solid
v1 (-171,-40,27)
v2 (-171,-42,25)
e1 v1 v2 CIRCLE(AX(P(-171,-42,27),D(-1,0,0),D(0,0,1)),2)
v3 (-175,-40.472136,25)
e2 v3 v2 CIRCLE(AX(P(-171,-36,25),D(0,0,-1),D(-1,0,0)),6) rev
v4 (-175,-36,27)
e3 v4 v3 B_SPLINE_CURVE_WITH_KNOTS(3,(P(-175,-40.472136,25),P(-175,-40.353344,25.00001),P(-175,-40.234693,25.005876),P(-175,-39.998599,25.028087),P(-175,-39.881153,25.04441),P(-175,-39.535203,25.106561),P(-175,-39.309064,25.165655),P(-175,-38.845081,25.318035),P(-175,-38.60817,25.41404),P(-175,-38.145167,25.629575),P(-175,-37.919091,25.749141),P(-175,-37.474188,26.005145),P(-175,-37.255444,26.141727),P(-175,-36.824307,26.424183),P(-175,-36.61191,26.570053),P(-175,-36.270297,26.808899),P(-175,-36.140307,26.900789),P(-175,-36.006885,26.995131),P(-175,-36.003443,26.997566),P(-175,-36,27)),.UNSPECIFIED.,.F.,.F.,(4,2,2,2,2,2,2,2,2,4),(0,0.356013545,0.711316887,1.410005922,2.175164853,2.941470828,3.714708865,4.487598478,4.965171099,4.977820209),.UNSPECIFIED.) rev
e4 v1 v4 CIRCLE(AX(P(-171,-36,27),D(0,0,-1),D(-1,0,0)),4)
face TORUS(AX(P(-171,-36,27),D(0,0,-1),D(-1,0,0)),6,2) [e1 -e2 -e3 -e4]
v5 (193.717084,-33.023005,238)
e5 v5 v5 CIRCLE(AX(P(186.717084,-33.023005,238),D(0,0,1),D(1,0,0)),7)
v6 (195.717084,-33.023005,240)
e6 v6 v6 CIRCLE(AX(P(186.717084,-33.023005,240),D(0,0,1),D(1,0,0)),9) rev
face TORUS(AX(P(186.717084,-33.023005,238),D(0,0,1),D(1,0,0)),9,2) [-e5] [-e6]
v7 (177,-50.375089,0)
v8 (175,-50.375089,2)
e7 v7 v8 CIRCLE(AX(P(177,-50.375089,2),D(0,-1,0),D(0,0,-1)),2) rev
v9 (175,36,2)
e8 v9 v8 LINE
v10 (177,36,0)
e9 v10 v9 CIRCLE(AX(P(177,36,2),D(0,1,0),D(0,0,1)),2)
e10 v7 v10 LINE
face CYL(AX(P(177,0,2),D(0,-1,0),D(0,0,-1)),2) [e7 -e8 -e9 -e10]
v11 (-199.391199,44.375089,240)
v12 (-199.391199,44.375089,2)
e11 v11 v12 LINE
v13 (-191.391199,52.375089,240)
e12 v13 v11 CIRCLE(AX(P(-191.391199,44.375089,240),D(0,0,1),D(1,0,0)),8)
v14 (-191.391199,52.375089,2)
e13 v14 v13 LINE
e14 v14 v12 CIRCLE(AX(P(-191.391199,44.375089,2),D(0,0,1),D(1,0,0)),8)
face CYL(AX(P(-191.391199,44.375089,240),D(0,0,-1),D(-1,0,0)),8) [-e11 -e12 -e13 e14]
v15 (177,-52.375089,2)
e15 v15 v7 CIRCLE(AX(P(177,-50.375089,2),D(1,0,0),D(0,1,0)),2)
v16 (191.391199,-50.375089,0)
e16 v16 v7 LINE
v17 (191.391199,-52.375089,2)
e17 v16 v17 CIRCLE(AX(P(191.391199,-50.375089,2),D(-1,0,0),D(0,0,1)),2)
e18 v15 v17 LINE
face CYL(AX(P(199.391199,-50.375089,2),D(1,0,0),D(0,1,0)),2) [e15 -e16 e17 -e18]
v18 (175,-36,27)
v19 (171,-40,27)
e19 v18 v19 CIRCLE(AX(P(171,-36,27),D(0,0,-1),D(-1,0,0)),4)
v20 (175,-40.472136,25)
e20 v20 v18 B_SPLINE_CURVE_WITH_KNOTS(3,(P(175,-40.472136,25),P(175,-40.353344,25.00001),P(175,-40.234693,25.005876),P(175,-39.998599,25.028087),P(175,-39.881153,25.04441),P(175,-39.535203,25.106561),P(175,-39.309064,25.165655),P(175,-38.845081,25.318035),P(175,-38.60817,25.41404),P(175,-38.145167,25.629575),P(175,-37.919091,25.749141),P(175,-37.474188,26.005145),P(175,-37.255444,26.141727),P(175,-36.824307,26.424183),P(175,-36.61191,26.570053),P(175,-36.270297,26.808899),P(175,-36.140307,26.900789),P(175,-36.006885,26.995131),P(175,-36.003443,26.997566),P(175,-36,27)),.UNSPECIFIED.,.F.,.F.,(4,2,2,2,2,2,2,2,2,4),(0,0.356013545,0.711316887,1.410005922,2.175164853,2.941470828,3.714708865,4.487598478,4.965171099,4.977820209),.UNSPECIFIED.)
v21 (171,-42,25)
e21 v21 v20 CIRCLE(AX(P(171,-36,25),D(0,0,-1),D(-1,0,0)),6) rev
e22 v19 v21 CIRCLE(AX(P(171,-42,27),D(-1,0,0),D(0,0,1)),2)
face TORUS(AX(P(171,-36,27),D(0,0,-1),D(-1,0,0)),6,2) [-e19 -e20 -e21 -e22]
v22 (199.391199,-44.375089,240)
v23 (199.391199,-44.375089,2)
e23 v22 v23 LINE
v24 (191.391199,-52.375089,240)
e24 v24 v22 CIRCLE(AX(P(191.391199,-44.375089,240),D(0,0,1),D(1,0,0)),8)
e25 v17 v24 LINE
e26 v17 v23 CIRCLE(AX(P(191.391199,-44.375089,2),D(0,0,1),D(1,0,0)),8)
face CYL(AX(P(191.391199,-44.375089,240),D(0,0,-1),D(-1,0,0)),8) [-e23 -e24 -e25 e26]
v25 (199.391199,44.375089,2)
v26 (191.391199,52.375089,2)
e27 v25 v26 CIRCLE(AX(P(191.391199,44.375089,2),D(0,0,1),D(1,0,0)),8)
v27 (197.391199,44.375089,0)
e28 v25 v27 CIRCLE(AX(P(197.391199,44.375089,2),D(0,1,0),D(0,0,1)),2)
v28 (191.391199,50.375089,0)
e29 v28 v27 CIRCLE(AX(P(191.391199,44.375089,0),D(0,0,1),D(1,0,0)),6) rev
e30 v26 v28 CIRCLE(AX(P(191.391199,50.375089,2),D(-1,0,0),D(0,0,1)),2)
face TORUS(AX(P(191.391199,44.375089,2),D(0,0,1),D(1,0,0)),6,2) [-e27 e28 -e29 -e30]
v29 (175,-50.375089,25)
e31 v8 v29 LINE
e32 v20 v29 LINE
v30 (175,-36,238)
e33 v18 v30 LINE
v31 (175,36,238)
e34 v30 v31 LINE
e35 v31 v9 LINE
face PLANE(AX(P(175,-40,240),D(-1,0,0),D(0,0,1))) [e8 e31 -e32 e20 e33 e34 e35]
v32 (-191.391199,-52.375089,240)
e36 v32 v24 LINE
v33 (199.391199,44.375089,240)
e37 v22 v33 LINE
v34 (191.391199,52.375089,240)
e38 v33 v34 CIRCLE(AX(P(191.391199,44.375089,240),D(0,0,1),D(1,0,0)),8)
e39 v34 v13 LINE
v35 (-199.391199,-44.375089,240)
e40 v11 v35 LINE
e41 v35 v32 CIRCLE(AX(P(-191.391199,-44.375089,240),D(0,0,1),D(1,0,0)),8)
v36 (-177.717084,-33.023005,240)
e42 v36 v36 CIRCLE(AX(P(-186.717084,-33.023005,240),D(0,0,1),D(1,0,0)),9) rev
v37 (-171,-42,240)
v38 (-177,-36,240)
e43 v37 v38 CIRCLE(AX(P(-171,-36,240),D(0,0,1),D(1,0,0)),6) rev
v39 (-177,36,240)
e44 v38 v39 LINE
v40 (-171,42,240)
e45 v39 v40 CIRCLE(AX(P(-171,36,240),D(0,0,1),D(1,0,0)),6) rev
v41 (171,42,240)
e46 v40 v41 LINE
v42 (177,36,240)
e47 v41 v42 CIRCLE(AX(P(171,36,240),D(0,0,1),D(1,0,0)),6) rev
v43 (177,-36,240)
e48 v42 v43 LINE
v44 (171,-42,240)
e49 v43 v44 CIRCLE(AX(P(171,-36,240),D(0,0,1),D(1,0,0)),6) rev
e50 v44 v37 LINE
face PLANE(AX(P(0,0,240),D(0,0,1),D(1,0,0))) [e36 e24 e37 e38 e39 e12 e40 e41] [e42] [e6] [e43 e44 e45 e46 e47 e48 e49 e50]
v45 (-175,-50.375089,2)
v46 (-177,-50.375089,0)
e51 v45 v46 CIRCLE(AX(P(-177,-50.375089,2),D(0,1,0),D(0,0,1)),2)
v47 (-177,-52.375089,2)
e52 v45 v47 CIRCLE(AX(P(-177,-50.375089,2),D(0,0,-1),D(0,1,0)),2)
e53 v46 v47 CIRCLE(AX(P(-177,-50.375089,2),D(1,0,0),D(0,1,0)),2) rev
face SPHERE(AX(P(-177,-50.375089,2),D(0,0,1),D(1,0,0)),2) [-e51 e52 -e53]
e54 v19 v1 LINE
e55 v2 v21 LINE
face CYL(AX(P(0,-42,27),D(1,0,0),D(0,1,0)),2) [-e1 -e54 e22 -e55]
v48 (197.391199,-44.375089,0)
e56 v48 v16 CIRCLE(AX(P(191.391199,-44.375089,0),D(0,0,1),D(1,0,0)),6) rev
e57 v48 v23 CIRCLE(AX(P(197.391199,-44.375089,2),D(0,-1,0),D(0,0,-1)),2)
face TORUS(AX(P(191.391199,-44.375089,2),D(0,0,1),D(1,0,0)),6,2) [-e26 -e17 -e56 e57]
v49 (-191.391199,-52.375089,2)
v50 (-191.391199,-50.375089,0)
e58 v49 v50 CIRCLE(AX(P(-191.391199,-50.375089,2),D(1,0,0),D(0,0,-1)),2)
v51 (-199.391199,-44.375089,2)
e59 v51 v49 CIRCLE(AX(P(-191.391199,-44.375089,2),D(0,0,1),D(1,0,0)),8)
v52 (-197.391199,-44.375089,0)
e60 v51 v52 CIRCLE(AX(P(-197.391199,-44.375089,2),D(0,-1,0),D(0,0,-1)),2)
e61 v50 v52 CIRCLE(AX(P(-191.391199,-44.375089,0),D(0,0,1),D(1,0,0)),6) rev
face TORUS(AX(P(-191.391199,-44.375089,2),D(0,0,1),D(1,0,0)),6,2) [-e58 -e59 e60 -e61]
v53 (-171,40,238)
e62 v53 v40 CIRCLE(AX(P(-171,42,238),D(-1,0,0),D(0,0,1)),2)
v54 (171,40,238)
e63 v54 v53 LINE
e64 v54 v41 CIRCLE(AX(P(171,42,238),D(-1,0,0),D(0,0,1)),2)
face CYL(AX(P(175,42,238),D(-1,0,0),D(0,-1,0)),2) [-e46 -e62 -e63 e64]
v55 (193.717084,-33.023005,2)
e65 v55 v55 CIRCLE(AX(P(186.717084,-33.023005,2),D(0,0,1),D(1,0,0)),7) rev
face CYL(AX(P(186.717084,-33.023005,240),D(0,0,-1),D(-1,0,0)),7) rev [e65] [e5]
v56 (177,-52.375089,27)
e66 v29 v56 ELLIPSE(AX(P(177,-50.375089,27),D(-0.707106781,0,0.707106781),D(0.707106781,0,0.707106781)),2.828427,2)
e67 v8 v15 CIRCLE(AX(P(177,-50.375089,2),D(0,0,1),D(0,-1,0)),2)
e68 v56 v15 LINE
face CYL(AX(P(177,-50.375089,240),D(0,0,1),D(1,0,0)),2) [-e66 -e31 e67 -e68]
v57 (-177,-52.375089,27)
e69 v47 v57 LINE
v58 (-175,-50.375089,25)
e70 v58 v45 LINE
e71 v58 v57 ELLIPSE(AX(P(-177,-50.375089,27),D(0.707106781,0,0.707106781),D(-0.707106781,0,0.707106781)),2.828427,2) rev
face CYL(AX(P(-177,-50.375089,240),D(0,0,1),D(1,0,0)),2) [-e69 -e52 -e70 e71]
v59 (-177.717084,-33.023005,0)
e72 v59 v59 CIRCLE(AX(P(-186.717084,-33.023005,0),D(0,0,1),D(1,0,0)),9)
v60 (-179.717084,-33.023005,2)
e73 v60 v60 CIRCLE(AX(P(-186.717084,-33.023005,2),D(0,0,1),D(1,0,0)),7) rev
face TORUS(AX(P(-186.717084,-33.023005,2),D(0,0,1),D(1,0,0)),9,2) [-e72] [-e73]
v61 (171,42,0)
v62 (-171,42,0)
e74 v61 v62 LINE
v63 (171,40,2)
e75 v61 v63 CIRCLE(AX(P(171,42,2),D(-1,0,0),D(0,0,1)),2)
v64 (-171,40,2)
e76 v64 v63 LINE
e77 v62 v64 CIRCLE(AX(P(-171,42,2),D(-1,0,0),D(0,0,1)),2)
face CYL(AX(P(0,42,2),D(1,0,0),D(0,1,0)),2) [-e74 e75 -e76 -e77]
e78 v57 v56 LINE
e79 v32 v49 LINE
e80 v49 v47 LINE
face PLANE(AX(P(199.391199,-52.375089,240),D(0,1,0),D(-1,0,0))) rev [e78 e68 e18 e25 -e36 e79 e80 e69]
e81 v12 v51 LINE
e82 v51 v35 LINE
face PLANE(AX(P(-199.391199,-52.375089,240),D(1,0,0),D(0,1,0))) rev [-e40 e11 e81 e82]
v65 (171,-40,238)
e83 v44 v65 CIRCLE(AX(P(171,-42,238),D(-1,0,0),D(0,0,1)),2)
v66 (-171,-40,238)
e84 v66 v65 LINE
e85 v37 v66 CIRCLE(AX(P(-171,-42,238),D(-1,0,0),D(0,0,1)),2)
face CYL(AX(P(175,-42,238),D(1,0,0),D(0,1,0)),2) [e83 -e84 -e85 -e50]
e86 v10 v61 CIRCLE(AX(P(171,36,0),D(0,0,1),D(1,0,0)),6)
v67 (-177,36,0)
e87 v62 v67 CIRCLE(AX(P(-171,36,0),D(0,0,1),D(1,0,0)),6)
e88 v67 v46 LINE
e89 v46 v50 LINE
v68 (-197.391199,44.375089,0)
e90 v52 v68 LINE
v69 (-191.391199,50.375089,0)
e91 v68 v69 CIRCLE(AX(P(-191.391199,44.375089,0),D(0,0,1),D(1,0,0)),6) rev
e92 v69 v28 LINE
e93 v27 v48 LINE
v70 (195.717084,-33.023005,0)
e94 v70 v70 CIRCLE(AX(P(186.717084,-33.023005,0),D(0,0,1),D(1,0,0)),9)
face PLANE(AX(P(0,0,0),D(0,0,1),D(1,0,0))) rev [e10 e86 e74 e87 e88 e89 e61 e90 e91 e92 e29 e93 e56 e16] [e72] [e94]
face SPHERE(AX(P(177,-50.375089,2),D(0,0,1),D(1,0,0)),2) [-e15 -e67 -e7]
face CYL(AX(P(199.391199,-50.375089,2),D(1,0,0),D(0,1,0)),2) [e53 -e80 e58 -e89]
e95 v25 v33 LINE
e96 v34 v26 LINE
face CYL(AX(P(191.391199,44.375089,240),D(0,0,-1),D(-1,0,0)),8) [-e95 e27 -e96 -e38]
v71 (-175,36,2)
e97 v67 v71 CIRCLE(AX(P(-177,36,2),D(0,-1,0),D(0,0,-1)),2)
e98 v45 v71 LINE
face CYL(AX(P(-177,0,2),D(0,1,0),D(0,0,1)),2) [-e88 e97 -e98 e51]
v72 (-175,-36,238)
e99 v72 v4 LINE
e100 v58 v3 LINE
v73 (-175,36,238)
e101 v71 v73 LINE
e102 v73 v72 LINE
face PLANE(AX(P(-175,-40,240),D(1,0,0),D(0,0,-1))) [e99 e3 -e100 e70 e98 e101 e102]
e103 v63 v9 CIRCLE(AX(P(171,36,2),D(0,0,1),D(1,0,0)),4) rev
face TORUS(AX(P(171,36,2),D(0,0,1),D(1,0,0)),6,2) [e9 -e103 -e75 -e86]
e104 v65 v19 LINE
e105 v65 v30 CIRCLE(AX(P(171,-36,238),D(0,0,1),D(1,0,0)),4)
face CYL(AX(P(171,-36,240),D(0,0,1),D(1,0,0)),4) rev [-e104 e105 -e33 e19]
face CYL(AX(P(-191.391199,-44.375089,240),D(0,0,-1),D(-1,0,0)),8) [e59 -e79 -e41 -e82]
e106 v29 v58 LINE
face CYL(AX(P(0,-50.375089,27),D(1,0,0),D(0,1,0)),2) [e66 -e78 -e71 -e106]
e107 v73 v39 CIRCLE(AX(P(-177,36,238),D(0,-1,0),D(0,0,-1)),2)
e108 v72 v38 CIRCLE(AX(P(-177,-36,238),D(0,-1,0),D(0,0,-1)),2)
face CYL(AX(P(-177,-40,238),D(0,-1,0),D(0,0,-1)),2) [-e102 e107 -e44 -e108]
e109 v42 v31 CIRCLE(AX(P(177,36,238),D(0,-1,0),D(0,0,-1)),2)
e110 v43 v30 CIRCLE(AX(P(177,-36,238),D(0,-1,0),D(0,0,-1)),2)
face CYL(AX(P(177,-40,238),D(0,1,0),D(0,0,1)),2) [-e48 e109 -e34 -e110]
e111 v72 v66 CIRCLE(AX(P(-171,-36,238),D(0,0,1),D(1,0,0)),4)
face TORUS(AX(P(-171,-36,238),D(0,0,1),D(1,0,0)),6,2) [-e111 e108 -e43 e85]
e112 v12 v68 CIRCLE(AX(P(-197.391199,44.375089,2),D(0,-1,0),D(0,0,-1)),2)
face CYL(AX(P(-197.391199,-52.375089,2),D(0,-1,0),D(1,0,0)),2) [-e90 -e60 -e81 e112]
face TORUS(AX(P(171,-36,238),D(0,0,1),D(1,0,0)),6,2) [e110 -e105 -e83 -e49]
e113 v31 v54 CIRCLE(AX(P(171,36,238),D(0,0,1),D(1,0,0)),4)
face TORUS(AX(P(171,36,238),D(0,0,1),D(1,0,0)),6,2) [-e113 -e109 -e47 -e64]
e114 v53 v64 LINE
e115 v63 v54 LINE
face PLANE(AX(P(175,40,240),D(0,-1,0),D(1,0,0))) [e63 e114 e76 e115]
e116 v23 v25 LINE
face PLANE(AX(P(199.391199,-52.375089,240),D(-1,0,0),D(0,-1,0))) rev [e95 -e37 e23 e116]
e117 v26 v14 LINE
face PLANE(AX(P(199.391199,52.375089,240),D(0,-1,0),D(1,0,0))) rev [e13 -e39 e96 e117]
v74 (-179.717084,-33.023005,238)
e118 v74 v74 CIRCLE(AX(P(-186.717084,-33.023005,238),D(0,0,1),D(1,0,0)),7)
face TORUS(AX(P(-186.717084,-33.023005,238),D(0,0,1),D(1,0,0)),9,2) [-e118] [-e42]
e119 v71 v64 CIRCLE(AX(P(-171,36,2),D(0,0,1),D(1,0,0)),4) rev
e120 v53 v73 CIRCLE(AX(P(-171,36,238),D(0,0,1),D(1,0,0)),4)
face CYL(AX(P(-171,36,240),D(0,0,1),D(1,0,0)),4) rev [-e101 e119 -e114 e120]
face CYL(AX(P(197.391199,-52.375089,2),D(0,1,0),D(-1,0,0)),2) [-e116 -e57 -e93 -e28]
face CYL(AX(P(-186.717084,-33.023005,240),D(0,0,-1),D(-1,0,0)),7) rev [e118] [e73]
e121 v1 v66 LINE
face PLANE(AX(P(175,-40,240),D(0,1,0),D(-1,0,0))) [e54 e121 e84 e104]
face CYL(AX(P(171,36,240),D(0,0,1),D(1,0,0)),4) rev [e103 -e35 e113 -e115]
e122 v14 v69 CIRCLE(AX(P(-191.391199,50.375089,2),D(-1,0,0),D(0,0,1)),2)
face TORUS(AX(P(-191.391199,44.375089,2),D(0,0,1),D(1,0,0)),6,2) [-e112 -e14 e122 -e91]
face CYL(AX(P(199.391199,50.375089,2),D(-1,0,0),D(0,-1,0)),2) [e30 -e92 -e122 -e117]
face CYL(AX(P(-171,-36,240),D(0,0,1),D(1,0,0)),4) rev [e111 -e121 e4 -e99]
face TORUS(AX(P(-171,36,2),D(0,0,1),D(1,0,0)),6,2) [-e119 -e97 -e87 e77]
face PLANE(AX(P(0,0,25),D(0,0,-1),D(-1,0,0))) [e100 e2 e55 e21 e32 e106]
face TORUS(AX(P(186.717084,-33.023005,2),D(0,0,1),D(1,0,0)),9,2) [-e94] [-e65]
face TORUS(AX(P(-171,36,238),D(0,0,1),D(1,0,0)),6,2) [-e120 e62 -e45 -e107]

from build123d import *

# Parameters (mm, degrees)
SKETCH_2_W          = 398.782397078
SKETCH_2_H          = 104.750177952
SKETCH_2_R          = 7
SKETCH_2_W_2        = 350
SKETCH_2_H_2        = 80
EXTRUDE_2_DEPTH     = 240
SKETCH_7_W          = 350
SKETCH_7_H          = 12.375088976
CUT_EXTRUDE_2_DEPTH = 25
FILLET_2_R          = 4
FILLET_8_R          = 8
FILLET_3_R          = 2
FILLET_5_R          = 2
FILLET_7_R          = 2
FILLET_9_R          = 2


with BuildPart() as part:
    # 草图2 → 凸台-拉伸2 (new body)
    with BuildSketch(Plane.XY):
        Rectangle(SKETCH_2_W, SKETCH_2_H)
        with Locations((-186.717084291, -33.023005364)):
            Circle(SKETCH_2_R, mode=Mode.SUBTRACT)
        with Locations(Location((186.717084291, -33.023005364, 0), (0, 0, 180))):
            Circle(SKETCH_2_R, mode=Mode.SUBTRACT)
        Rectangle(SKETCH_2_W_2, SKETCH_2_H_2, mode=Mode.SUBTRACT)
    extrude(amount=EXTRUDE_2_DEPTH)

    # 草图7 → 切除-拉伸2 (cut)
    with BuildSketch(Plane(origin=(0, 0, 0), x_dir=(-1, 0, 0), z_dir=(0, 0, -1))):
        with Locations((0, -46.187544488)):
            Rectangle(SKETCH_7_W, SKETCH_7_H)
    extrude(amount=-CUT_EXTRUDE_2_DEPTH, mode=Mode.SUBTRACT)

    # 圆角2
    fillet_2_edges = [part.edges().sort_by_distance(p)[0] for p in [
        (-175, 40, 120),
        (-175, -40, 132.5),
        (175, -40, 132.5),
        (175, 40, 120),
    ]]
    fillet(fillet_2_edges, radius=FILLET_2_R)

    # 圆角8
    fillet_8_edges = [part.edges().sort_by_distance(p)[0] for p in [
        (-199.391198539, 52.375088976, 120),
        (199.391198539, 52.375088976, 120),
        (199.391198539, -52.375088976, 120),
        (-199.391198539, -52.375088976, 120),
    ]]
    fillet(fillet_8_edges, radius=FILLET_8_R)

    # 圆角3
    fillet_3_edges = [part.edges().sort_by_distance(p)[0] for p in [
        (175, -8.187544488, 0),
        (183.195599269, -52.375088976, 0),
        (-175, -8.187544488, 0),
        (0, 40, 0),
        (-173.828427125, 38.828427125, 0),
        (173.828427125, 38.828427125, 0),
        (-199.391198539, 0, 0),
        (-183.195599269, -52.375088976, 0),
        (0, 52.375088976, 0),
        (199.391198539, 0, 0),
        (197.048052788, 50.031943226, 0),
        (197.048052788, -50.031943226, 0),
        (-197.048052788, -50.031943226, 0),
        (-197.048052788, 50.031943226, 0),
    ]]
    fillet(fillet_3_edges, radius=FILLET_3_R)

    # 圆角5
    fillet_5_edges = [part.edges().sort_by_distance(p)[0] for p in [
        (0, -40, 240),
        (175, 0, 240),
        (-175, 0, 240),
        (0, 40, 240),
        (173.828427125, -38.828427125, 240),
        (-173.828427125, -38.828427125, 240),
        (-173.828427125, 38.828427125, 240),
        (173.828427125, 38.828427125, 240),
    ]]
    fillet(fillet_5_edges, radius=FILLET_5_R)

    # 圆角7
    fillet_7_edges = [part.edges().sort_by_distance(p)[0] for p in [
        (-193.717084291, -33.023005364, 0),
        (-193.717084291, -33.023005364, 240),
        (193.717084291, -33.023005364, 0),
        (193.717084291, -33.023005364, 240),
    ]]
    fillet(fillet_7_edges, radius=FILLET_7_R)

    # 圆角9
    # the kernel refuses this fillet: 2 mm, written as the material it takes off along each edge
    with BuildSketch(Plane(origin=(177, -50.375088976, 2), x_dir=(-1, 0, 0), z_dir=(0, -1, 0))) as fillet_9_piece_1_section:
        Polygon((0, 0), (FILLET_9_R * 1.02, 0), (FILLET_9_R * 1.02, FILLET_9_R * 1.02), (0, FILLET_9_R * 1.02), align=None)
    fillet_9_piece_1 = extrude(amount=FILLET_9_R * 1.02, mode=Mode.PRIVATE)
    fillet_9_piece_1 = fillet_9_piece_1 - Plane(origin=(177, -50.375088976, 2), x_dir=(0.7071067811865475, 0, 0.7071067811865475), z_dir=(0, -1, 0)) * Sphere(FILLET_9_R, mode=Mode.PRIVATE)
    add(fillet_9_piece_1, mode=Mode.SUBTRACT)
    with BuildSketch(Plane(origin=(-177, -50.375088976, 2), x_dir=(1, 0, 0), z_dir=(0, -1, 0))) as fillet_9_piece_2_section:
        Polygon((0, 0), (FILLET_9_R * 1.02, 0), (FILLET_9_R * 1.02, -FILLET_9_R * 1.02), (0, -FILLET_9_R * 1.02), align=None)
    fillet_9_piece_2 = extrude(amount=FILLET_9_R * 1.02, mode=Mode.PRIVATE)
    fillet_9_piece_2 = fillet_9_piece_2 - Plane(origin=(-177, -50.375088976, 2), x_dir=(-0.7071067811865475, 0, 0.7071067811865475), z_dir=(0, -1, 0)) * Sphere(FILLET_9_R, mode=Mode.PRIVATE)
    add(fillet_9_piece_2, mode=Mode.SUBTRACT)
    with BuildSketch(Plane(origin=(175, -52.375088976, 2), x_dir=(1, 0, 0), z_dir=(0, 0, 1))) as fillet_9_piece_3:
        with BuildLine():
            CenterArc((FILLET_9_R, FILLET_9_R), FILLET_9_R, 180, 90)
            Line((0, FILLET_9_R), (0, 0))
            Line((0, 0), (FILLET_9_R, 0))
        make_face()
    extrude(amount=23, mode=Mode.SUBTRACT)
    with BuildSketch(Plane(origin=(-175, -52.375088976, 25), x_dir=(0, 0, 1), z_dir=(1, 0, 0))) as fillet_9_piece_4:
        with BuildLine():
            CenterArc((FILLET_9_R, -FILLET_9_R), FILLET_9_R, 90, 90)
            Line((0, -FILLET_9_R), (0, 0))
            Line((0, 0), (FILLET_9_R, 0))
        make_face()
    extrude(amount=350, mode=Mode.SUBTRACT)
    with BuildSketch(Plane(origin=(-175, -52.375088976, 2), x_dir=(-1, 0, 0), z_dir=(0, 0, 1))) as fillet_9_piece_5:
        with BuildLine():
            CenterArc((FILLET_9_R, -FILLET_9_R), FILLET_9_R, 90, 90)
            Line((0, -FILLET_9_R), (0, 0))
            Line((0, 0), (FILLET_9_R, 0))
        make_face()
    extrude(amount=23, mode=Mode.SUBTRACT)
    with BuildSketch(Plane(origin=(171, -40, 25), x_dir=(0, 0, 1), z_dir=(-1, 0, 0))) as fillet_9_piece_6:
        with BuildLine():
            CenterArc((FILLET_9_R, -FILLET_9_R), FILLET_9_R, 90, 90)
            Line((0, -FILLET_9_R), (0, 0))
            Line((0, 0), (FILLET_9_R, 0))
        make_face()
    extrude(amount=342, mode=Mode.SUBTRACT)
    with BuildSketch(Plane(origin=(171, -36, 25), x_dir=(0, -1, 0), z_dir=(-1, 0, 0))) as fillet_9_piece_7_section:
        with BuildLine():
            CenterArc((4 + FILLET_9_R, FILLET_9_R), FILLET_9_R, 180, 90)
            Line((4 + FILLET_9_R, 0), (4, 0))
            Line((4, 0), (4, FILLET_9_R))
        make_face()
    fillet_9_piece_7 = revolve(axis=Axis((171, -36, 25), (0, 0, 1)), revolution_arc=161.648494619, mode=Mode.PRIVATE)
    fillet_9_piece_7 = split(fillet_9_piece_7, bisect_by=Plane(origin=(175, -36, 25), z_dir=(-1, 0, 0)), keep=Keep.TOP, mode=Mode.PRIVATE)
    add(fillet_9_piece_7, mode=Mode.SUBTRACT)
    with BuildSketch(Plane(origin=(-171, -36, 25), x_dir=(0, -1, 0), z_dir=(1, 0, 0))) as fillet_9_piece_8_section:
        with BuildLine():
            CenterArc((4 + FILLET_9_R, -FILLET_9_R), FILLET_9_R, 90, 90)
            Line((4 + FILLET_9_R, 0), (4, 0))
            Line((4, 0), (4, -FILLET_9_R))
        make_face()
    fillet_9_piece_8 = revolve(axis=Axis((-171, -36, 25), (0, 0, -1)), revolution_arc=161.648494619, mode=Mode.PRIVATE)
    fillet_9_piece_8 = split(fillet_9_piece_8, bisect_by=Plane(origin=(-175, -36, 25), z_dir=(1, 0, 0)), keep=Keep.TOP, mode=Mode.PRIVATE)
    add(fillet_9_piece_8, mode=Mode.SUBTRACT)
    with BuildSketch(Plane(origin=(175, -52.375088976, 2), x_dir=(1, 0, 0), z_dir=(0, 0, 1))) as fillet_9_piece_9a_section:
        with BuildLine():
            CenterArc((FILLET_9_R, FILLET_9_R), FILLET_9_R, 180, 90)
            Line((0, FILLET_9_R), (0, 0))
            Line((0, 0), (FILLET_9_R, 0))
        make_face()
    fillet_9_piece_9a = extrude(amount=28, mode=Mode.PRIVATE)
    fillet_9_piece_9a = split(fillet_9_piece_9a, bisect_by=Plane(origin=(175, -52.375088976, 25), z_dir=(0, 0, 1)), keep=Keep.TOP, mode=Mode.PRIVATE)
    with BuildSketch(Plane(origin=(-175, -52.375088976, 25), x_dir=(0, 0, 1), z_dir=(1, 0, 0))) as fillet_9_piece_9b_section:
        with BuildLine():
            CenterArc((FILLET_9_R, -FILLET_9_R), FILLET_9_R, 90, 90)
            Line((0, -FILLET_9_R), (0, 0))
            Line((0, 0), (FILLET_9_R, 0))
        make_face()
    fillet_9_piece_9b = extrude(amount=355, mode=Mode.PRIVATE)
    fillet_9_piece_9b = split(fillet_9_piece_9b, bisect_by=Plane(origin=(175, -52.375088976, 25), z_dir=(1, 0, 0)), keep=Keep.TOP, mode=Mode.PRIVATE)
    fillet_9_piece_9 = fillet_9_piece_9a & fillet_9_piece_9b
    add(fillet_9_piece_9, mode=Mode.SUBTRACT)
    with BuildSketch(Plane(origin=(-180, -52.375088976, 25), x_dir=(0, 0, 1), z_dir=(1, 0, 0))) as fillet_9_piece_10a_section:
        with BuildLine():
            CenterArc((FILLET_9_R, -FILLET_9_R), FILLET_9_R, 90, 90)
            Line((0, -FILLET_9_R), (0, 0))
            Line((0, 0), (FILLET_9_R, 0))
        make_face()
    fillet_9_piece_10a = extrude(amount=355, mode=Mode.PRIVATE)
    fillet_9_piece_10a = split(fillet_9_piece_10a, bisect_by=Plane(origin=(-175, -52.375088976, 25), z_dir=(-1, 0, 0)), keep=Keep.TOP, mode=Mode.PRIVATE)
    with BuildSketch(Plane(origin=(-175, -52.375088976, 2), x_dir=(-1, 0, 0), z_dir=(0, 0, 1))) as fillet_9_piece_10b_section:
        with BuildLine():
            CenterArc((FILLET_9_R, -FILLET_9_R), FILLET_9_R, 90, 90)
            Line((0, -FILLET_9_R), (0, 0))
            Line((0, 0), (FILLET_9_R, 0))
        make_face()
    fillet_9_piece_10b = extrude(amount=28, mode=Mode.PRIVATE)
    fillet_9_piece_10b = split(fillet_9_piece_10b, bisect_by=Plane(origin=(-175, -52.375088976, 25), z_dir=(0, 0, 1)), keep=Keep.TOP, mode=Mode.PRIVATE)
    fillet_9_piece_10 = fillet_9_piece_10a & fillet_9_piece_10b
    add(fillet_9_piece_10, mode=Mode.SUBTRACT)


solid = part.part
